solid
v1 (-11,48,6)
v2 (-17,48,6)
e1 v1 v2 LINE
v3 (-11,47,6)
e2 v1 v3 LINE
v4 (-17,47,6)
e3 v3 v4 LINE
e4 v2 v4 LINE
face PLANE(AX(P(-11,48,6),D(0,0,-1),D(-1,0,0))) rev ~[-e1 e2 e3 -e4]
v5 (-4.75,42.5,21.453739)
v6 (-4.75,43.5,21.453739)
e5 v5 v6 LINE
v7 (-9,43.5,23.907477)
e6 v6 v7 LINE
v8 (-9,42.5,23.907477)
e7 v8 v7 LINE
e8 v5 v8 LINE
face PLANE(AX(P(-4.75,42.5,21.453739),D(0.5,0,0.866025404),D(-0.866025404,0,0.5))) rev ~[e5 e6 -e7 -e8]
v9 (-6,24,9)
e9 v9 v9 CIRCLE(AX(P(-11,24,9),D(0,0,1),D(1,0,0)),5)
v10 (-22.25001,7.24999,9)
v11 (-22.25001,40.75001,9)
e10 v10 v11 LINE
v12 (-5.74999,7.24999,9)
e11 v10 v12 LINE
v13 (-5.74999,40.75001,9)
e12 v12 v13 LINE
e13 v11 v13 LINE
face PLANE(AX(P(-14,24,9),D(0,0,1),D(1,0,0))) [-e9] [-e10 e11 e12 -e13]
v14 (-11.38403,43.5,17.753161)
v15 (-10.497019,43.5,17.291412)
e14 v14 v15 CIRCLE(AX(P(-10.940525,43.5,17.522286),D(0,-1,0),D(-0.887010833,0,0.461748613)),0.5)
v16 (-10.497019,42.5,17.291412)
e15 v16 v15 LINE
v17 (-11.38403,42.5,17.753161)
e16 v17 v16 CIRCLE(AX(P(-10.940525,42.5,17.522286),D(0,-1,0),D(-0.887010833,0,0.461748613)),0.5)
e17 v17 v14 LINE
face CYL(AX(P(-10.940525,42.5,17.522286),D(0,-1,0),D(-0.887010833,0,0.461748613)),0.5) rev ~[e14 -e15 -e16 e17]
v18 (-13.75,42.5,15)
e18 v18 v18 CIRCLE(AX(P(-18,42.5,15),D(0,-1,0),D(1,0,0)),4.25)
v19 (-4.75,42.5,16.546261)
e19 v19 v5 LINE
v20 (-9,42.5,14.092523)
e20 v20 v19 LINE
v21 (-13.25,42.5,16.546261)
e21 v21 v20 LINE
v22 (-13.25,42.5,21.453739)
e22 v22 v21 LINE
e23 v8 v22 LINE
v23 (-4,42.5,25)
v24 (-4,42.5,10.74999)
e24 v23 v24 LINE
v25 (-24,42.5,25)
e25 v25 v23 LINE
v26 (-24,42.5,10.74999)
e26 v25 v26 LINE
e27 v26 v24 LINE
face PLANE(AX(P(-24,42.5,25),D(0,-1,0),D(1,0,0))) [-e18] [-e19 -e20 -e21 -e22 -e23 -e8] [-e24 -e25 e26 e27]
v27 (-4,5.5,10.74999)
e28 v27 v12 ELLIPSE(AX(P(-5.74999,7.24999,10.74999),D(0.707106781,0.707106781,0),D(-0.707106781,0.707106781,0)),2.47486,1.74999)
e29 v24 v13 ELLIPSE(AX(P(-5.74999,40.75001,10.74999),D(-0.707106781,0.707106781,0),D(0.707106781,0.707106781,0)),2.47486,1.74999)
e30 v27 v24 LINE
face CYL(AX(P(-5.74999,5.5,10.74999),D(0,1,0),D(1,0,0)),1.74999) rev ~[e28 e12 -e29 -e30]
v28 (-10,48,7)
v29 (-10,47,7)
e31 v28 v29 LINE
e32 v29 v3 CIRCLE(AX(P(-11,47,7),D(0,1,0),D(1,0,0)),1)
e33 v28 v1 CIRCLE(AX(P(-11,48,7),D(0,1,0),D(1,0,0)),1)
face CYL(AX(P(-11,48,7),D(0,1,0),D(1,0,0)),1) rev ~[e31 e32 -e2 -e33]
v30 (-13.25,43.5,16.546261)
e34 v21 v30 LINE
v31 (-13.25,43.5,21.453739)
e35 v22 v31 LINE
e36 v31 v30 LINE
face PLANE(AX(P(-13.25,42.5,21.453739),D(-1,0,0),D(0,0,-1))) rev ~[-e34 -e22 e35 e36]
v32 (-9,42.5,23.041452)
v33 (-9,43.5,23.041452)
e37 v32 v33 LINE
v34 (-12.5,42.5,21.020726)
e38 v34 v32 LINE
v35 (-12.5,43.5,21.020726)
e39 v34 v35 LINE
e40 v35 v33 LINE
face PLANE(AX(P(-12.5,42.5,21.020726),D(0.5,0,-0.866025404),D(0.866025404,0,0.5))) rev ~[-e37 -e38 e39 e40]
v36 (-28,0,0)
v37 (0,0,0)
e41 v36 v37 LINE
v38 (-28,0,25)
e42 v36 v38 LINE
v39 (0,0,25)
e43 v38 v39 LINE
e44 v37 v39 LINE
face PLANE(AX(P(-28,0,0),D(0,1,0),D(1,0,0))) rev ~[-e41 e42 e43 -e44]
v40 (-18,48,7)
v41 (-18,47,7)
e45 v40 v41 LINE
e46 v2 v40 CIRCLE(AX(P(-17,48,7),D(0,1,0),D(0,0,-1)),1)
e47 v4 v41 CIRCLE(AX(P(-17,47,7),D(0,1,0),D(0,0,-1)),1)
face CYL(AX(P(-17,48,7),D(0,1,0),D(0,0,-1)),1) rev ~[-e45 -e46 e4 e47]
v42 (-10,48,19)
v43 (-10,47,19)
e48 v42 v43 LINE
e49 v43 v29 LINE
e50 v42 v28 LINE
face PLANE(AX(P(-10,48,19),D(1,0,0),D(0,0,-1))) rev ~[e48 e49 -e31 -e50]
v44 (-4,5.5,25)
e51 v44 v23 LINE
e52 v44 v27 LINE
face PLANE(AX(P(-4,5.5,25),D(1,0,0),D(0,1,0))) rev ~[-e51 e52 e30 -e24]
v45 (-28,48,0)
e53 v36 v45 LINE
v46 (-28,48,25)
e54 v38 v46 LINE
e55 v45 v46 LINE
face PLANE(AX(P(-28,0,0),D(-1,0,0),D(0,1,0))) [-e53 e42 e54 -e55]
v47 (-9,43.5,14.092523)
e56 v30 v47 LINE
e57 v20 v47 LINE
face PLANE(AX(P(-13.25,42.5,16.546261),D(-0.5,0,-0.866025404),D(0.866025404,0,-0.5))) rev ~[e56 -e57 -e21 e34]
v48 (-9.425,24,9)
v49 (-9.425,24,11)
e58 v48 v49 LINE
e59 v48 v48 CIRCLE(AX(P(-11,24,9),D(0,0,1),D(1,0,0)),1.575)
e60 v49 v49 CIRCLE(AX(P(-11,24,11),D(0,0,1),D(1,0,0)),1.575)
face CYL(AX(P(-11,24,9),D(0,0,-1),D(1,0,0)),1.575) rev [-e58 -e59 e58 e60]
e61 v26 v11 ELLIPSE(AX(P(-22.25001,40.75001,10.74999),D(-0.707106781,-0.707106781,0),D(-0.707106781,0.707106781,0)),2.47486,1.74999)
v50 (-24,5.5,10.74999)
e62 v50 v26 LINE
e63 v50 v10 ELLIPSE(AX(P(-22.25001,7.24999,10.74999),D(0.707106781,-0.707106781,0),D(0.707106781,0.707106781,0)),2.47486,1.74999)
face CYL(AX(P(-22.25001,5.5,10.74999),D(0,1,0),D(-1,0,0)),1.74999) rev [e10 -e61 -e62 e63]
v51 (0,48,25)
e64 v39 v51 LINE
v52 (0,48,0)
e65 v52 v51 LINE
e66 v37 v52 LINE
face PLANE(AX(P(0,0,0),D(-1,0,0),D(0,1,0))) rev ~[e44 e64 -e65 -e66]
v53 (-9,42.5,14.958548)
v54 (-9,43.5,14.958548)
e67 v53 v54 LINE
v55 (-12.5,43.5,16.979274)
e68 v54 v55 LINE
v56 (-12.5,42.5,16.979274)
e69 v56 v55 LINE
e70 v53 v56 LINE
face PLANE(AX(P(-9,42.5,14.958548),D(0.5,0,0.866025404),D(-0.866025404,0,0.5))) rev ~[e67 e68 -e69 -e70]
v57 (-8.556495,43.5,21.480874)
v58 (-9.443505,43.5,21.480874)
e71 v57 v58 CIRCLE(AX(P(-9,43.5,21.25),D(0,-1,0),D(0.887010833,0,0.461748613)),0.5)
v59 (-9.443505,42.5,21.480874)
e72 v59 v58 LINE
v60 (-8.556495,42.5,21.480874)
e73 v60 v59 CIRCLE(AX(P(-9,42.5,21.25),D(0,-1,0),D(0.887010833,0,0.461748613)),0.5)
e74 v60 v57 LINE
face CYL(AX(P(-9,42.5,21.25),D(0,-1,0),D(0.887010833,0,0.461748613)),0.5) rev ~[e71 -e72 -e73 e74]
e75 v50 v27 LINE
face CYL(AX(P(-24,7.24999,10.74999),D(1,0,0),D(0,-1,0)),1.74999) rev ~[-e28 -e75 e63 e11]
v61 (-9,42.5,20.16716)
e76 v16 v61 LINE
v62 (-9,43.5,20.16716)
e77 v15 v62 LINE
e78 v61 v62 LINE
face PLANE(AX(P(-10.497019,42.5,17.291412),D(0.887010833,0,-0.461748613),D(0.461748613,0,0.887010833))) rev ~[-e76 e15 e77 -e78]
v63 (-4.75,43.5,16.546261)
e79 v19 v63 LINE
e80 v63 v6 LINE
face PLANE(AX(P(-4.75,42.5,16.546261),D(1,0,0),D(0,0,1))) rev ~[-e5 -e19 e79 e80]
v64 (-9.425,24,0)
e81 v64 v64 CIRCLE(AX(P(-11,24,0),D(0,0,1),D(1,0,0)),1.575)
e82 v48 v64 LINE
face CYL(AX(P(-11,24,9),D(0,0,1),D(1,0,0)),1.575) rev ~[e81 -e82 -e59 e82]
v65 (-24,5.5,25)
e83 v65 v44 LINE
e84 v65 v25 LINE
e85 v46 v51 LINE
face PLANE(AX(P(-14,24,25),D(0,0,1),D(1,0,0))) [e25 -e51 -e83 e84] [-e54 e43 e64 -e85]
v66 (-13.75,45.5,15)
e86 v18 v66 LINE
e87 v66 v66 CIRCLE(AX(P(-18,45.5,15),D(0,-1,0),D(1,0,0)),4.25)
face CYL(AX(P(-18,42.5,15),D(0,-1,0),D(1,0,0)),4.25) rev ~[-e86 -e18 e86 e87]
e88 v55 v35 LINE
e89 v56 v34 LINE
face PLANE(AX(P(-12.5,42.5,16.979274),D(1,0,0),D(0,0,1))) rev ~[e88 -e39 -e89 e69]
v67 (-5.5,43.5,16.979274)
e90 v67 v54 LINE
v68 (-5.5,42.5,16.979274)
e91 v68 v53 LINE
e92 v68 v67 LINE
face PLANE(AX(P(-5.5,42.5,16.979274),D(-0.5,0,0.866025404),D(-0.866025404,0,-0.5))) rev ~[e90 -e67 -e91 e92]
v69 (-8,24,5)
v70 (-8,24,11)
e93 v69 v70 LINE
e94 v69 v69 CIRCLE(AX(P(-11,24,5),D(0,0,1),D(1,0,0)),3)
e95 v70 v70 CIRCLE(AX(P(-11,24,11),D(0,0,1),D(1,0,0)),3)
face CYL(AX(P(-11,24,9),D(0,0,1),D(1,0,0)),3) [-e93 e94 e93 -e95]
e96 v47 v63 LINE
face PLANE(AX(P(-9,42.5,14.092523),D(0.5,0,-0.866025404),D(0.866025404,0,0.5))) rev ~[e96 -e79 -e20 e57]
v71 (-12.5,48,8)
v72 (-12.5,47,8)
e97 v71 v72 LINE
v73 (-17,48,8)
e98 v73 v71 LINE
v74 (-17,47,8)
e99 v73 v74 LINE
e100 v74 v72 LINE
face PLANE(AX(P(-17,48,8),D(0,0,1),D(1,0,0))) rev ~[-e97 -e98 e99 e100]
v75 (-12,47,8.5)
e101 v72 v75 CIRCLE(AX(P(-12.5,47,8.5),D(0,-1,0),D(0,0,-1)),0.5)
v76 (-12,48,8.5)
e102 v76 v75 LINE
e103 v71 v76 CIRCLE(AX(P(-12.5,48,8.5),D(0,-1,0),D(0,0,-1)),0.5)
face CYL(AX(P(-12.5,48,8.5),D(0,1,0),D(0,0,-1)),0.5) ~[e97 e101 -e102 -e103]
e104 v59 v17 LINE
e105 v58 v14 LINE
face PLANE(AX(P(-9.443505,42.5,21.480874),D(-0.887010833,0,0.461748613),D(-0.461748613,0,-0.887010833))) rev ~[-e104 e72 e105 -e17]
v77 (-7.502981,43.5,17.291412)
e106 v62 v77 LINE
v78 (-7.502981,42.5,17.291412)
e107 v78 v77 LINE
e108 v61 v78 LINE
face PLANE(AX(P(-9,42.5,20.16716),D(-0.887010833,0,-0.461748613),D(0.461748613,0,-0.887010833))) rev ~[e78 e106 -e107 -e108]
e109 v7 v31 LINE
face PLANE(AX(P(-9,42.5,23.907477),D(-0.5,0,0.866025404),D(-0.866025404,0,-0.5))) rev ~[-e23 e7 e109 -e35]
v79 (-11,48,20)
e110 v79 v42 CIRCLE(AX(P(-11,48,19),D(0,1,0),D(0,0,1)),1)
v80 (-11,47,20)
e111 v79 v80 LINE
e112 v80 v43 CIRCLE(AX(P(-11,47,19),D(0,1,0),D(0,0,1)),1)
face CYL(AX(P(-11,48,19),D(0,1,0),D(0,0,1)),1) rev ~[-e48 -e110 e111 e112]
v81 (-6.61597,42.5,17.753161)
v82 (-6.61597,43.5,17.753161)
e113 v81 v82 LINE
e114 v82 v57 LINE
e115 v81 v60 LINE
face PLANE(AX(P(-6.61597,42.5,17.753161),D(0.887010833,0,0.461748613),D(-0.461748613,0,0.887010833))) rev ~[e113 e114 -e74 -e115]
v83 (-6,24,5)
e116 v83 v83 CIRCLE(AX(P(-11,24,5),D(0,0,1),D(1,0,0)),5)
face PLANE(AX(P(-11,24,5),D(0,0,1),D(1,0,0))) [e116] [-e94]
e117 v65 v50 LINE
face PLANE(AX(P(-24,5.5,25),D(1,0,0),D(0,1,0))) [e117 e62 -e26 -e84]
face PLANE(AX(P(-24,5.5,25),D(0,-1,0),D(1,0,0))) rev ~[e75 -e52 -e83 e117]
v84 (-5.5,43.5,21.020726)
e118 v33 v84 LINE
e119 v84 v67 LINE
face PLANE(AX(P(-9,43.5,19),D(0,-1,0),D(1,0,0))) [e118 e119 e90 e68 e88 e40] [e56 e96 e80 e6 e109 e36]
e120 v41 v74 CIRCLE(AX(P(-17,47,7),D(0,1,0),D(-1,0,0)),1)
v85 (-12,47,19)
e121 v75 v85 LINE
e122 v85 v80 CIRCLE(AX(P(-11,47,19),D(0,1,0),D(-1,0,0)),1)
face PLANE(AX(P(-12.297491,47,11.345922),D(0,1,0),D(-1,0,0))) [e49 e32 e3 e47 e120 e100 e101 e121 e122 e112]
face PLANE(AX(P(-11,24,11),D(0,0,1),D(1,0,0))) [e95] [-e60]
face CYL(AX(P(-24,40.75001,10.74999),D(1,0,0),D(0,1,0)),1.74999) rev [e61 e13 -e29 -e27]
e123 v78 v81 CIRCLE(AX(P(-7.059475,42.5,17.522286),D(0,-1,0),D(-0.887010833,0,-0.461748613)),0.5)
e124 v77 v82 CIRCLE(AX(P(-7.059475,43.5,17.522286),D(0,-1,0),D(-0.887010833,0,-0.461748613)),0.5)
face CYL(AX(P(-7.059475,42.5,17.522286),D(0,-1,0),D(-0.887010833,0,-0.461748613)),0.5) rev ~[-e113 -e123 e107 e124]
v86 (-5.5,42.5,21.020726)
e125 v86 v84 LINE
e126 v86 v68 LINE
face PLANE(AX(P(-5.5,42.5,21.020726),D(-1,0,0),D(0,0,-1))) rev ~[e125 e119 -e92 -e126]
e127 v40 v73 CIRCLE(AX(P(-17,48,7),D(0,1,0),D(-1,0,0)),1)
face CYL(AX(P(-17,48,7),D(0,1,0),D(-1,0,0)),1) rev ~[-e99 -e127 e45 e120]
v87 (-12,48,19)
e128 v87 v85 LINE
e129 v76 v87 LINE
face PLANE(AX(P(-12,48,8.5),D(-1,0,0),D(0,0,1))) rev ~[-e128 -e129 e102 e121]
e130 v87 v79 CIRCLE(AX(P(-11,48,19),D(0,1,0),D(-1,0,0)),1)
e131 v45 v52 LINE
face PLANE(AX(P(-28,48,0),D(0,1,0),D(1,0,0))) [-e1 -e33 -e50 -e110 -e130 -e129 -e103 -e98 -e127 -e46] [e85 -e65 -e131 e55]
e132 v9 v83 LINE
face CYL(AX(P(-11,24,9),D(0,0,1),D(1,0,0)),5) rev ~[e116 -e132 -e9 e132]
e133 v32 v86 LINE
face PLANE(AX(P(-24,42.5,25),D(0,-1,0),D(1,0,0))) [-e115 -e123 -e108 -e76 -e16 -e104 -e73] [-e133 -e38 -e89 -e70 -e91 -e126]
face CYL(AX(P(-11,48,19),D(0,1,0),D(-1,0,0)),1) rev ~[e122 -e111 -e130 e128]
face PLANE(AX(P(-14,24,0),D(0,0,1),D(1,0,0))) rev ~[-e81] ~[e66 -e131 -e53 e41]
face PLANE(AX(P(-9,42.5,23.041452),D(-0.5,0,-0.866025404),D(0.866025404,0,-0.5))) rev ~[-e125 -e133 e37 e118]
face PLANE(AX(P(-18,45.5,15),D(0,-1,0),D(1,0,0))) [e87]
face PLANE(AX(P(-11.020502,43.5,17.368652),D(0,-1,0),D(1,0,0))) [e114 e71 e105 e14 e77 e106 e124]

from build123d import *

# Parameters (mm, degrees)
F0_W      = 28
F0_H      = 48
F1_DEPTH  = 25
F2_W      = 20
F2_H      = 37
F3_DEPTH  = 16
F4_R      = 3
F4_R_2    = 1.575
F5_DEPTH  = 2
F6_R      = 5
F6_R_2    = 3
F7_DEPTH  = 4
F9_DEPTH  = 9.001
F10_R     = 4.25
F11_DEPTH = 3
F13_DEPTH = 1
F17_DEPTH = 1
F18_R     = 1.74999


# Not quite as in the source:
# - a fillet or chamfer is up to 0.001 mm smaller than in the source, because OpenCascade refuses the exact size


with BuildPart() as f1:
    # F0 (on Top) → F1 (new body)
    with BuildSketch(Plane.XY):
        with Locations((-14, 24)):
            Rectangle(F0_W, F0_H)
    extrude(amount=F1_DEPTH)

    # F2 (on face) → F3 (cut)
    with BuildSketch(Plane.XY.offset(25)):
        with Locations((-14, 24)):
            Rectangle(F2_W, F2_H)
    extrude(amount=-F3_DEPTH, mode=Mode.SUBTRACT)

    # F4 (on face) → F5 (join)
    with BuildSketch(Plane.XY.offset(9)):
        with Locations((-11, 24)):
            Circle(F4_R)
        with Locations((-11, 24)):
            Circle(F4_R_2, mode=Mode.SUBTRACT)
    extrude(amount=F5_DEPTH)

    # F6 (on face) → F7 (cut)
    with BuildSketch(Plane.XY.offset(9)):
        with Locations((-11, 24)):
            Circle(F6_R)
        with Locations((-11, 24)):
            Circle(F6_R_2, mode=Mode.SUBTRACT)
    extrude(amount=-F7_DEPTH, mode=Mode.SUBTRACT)

    # F9 (cut, through all): a face of the model
    f9_faces = [f1.faces().sort_by_distance(p)[0] for p in [
        (-11, 24, 9),
    ]]
    extrude(f9_faces, amount=-F9_DEPTH, mode=Mode.SUBTRACT)

    # F10 (on face) → F11 (cut)
    with BuildSketch(Plane.XZ.offset(-42.5)):
        with Locations((-18, 15)):
            Circle(F10_R)
    extrude(amount=-F11_DEPTH, mode=Mode.SUBTRACT)

    # F12 (on face) → F13 (cut)
    with BuildSketch(Plane(origin=(0, 48, 0), x_dir=(-1, 0, 0), z_dir=(0, 1, 0))):
        with BuildLine():
            ThreePointArc((11, 20), (10.2928932188, 19.7071067812), (10, 19))
            Line((10, 19), (10, 7))
            ThreePointArc((10, 7), (10.2928932188, 6.2928932188), (11, 6))
            Line((11, 6), (17, 6))
            ThreePointArc((17, 6), (17.7071067812, 6.2928932188), (18, 7))
            ThreePointArc((18, 7), (17.7071067812, 7.7071067812), (17, 8))
            Line((17, 8), (12.5, 8))
            ThreePointArc((12.5, 8), (12.1464466094, 8.1464466094), (12, 8.5))
            Line((12, 8.5), (12, 19))
            ThreePointArc((12, 19), (11.7071067812, 19.7071067812), (11, 20))
        make_face()
    extrude(amount=-F13_DEPTH, mode=Mode.SUBTRACT)

    # F15 (on face) → F17 (cut)
    with BuildSketch(Plane.XZ.offset(-42.5)):
        Polygon((-9, 14.0925227119), (-4.75, 16.5462613559), (-4.75, 21.4537386441), (-9, 23.9074772881), (-13.25, 21.4537386441), (-13.25, 16.5462613559), align=None)
        Polygon((-9, 14.9585481157), (-12.5, 16.9792740578), (-12.5, 21.0207259422), (-9, 23.0414518843), (-5.5, 21.0207259422), (-5.5, 16.9792740578), align=None, mode=Mode.SUBTRACT)
        with BuildLine():
            Line((-10.4970194787, 17.2914120527), (-11.3840303118, 17.7531606659))
            ThreePointArc((-11.3840303118, 17.7531606659), (-11.1713992019, 17.0787809427), (-10.4970194787, 17.2914120527))
        make_face()
        with BuildLine():
            ThreePointArc((-9.4435054166, 21.0191256934), (-9.5, 21.25), (-9.4435054166, 21.4808743066))
            Line((-9.4435054166, 21.4808743066), (-11.3840303118, 17.7531606659))
            Line((-11.3840303118, 17.7531606659), (-10.4970194787, 17.2914120527))
            Line((-10.4970194787, 17.2914120527), (-9, 20.1671597149))
            Line((-9, 20.1671597149), (-9.4435054166, 21.0191256934))
        make_face()
        with BuildLine():
            ThreePointArc((-8.5564945834, 21.0191256934), (-8.5143289651, 21.1311570538), (-8.5, 21.25))
            ThreePointArc((-8.5, 21.25), (-8.5143289651, 21.3688429462), (-8.5564945834, 21.4808743066))
            ThreePointArc((-8.5564945834, 21.4808743066), (-9, 21.75), (-9.4435054166, 21.4808743066))
            ThreePointArc((-9.4435054166, 21.4808743066), (-9.5, 21.25), (-9.4435054166, 21.0191256934))
            ThreePointArc((-9.4435054166, 21.0191256934), (-9, 20.75), (-8.5564945834, 21.0191256934))
        make_face()
        with BuildLine():
            Line((-9, 20.1671597149), (-8.5564945834, 21.0191256934))
            ThreePointArc((-8.5564945834, 21.0191256934), (-9, 20.75), (-9.4435054166, 21.0191256934))
            Line((-9.4435054166, 21.0191256934), (-9, 20.1671597149))
        make_face()
        with BuildLine():
            ThreePointArc((-8.5564945834, 21.4808743066), (-8.5143289651, 21.3688429462), (-8.5, 21.25))
            ThreePointArc((-8.5, 21.25), (-8.5143289651, 21.1311570538), (-8.5564945834, 21.0191256934))
            Line((-8.5564945834, 21.0191256934), (-9, 20.1671597149))
            Line((-9, 20.1671597149), (-7.5029805213, 17.2914120527))
            Line((-7.5029805213, 17.2914120527), (-6.6159696882, 17.7531606659))
            Line((-6.6159696882, 17.7531606659), (-8.5564945834, 21.4808743066))
        make_face()
        with BuildLine():
            ThreePointArc((-7.5029805213, 17.2914120527), (-6.8286007981, 17.0787809427), (-6.6159696882, 17.7531606659))
            Line((-6.6159696882, 17.7531606659), (-7.5029805213, 17.2914120527))
        make_face()
    extrude(amount=-F17_DEPTH, mode=Mode.SUBTRACT)

    # F18 (radius 1.75 in the source; OpenCascade refuses exactly that, so slightly less here)
    f18_edges = [f1.edges().sort_by_distance(p)[0] for p in [
        (-24, 24, 9),
        (-14, 42.5, 9),
        (-4, 24, 9),
        (-14, 5.5, 9),
    ]]
    fillet(f18_edges, radius=F18_R)


solid = f1.part
